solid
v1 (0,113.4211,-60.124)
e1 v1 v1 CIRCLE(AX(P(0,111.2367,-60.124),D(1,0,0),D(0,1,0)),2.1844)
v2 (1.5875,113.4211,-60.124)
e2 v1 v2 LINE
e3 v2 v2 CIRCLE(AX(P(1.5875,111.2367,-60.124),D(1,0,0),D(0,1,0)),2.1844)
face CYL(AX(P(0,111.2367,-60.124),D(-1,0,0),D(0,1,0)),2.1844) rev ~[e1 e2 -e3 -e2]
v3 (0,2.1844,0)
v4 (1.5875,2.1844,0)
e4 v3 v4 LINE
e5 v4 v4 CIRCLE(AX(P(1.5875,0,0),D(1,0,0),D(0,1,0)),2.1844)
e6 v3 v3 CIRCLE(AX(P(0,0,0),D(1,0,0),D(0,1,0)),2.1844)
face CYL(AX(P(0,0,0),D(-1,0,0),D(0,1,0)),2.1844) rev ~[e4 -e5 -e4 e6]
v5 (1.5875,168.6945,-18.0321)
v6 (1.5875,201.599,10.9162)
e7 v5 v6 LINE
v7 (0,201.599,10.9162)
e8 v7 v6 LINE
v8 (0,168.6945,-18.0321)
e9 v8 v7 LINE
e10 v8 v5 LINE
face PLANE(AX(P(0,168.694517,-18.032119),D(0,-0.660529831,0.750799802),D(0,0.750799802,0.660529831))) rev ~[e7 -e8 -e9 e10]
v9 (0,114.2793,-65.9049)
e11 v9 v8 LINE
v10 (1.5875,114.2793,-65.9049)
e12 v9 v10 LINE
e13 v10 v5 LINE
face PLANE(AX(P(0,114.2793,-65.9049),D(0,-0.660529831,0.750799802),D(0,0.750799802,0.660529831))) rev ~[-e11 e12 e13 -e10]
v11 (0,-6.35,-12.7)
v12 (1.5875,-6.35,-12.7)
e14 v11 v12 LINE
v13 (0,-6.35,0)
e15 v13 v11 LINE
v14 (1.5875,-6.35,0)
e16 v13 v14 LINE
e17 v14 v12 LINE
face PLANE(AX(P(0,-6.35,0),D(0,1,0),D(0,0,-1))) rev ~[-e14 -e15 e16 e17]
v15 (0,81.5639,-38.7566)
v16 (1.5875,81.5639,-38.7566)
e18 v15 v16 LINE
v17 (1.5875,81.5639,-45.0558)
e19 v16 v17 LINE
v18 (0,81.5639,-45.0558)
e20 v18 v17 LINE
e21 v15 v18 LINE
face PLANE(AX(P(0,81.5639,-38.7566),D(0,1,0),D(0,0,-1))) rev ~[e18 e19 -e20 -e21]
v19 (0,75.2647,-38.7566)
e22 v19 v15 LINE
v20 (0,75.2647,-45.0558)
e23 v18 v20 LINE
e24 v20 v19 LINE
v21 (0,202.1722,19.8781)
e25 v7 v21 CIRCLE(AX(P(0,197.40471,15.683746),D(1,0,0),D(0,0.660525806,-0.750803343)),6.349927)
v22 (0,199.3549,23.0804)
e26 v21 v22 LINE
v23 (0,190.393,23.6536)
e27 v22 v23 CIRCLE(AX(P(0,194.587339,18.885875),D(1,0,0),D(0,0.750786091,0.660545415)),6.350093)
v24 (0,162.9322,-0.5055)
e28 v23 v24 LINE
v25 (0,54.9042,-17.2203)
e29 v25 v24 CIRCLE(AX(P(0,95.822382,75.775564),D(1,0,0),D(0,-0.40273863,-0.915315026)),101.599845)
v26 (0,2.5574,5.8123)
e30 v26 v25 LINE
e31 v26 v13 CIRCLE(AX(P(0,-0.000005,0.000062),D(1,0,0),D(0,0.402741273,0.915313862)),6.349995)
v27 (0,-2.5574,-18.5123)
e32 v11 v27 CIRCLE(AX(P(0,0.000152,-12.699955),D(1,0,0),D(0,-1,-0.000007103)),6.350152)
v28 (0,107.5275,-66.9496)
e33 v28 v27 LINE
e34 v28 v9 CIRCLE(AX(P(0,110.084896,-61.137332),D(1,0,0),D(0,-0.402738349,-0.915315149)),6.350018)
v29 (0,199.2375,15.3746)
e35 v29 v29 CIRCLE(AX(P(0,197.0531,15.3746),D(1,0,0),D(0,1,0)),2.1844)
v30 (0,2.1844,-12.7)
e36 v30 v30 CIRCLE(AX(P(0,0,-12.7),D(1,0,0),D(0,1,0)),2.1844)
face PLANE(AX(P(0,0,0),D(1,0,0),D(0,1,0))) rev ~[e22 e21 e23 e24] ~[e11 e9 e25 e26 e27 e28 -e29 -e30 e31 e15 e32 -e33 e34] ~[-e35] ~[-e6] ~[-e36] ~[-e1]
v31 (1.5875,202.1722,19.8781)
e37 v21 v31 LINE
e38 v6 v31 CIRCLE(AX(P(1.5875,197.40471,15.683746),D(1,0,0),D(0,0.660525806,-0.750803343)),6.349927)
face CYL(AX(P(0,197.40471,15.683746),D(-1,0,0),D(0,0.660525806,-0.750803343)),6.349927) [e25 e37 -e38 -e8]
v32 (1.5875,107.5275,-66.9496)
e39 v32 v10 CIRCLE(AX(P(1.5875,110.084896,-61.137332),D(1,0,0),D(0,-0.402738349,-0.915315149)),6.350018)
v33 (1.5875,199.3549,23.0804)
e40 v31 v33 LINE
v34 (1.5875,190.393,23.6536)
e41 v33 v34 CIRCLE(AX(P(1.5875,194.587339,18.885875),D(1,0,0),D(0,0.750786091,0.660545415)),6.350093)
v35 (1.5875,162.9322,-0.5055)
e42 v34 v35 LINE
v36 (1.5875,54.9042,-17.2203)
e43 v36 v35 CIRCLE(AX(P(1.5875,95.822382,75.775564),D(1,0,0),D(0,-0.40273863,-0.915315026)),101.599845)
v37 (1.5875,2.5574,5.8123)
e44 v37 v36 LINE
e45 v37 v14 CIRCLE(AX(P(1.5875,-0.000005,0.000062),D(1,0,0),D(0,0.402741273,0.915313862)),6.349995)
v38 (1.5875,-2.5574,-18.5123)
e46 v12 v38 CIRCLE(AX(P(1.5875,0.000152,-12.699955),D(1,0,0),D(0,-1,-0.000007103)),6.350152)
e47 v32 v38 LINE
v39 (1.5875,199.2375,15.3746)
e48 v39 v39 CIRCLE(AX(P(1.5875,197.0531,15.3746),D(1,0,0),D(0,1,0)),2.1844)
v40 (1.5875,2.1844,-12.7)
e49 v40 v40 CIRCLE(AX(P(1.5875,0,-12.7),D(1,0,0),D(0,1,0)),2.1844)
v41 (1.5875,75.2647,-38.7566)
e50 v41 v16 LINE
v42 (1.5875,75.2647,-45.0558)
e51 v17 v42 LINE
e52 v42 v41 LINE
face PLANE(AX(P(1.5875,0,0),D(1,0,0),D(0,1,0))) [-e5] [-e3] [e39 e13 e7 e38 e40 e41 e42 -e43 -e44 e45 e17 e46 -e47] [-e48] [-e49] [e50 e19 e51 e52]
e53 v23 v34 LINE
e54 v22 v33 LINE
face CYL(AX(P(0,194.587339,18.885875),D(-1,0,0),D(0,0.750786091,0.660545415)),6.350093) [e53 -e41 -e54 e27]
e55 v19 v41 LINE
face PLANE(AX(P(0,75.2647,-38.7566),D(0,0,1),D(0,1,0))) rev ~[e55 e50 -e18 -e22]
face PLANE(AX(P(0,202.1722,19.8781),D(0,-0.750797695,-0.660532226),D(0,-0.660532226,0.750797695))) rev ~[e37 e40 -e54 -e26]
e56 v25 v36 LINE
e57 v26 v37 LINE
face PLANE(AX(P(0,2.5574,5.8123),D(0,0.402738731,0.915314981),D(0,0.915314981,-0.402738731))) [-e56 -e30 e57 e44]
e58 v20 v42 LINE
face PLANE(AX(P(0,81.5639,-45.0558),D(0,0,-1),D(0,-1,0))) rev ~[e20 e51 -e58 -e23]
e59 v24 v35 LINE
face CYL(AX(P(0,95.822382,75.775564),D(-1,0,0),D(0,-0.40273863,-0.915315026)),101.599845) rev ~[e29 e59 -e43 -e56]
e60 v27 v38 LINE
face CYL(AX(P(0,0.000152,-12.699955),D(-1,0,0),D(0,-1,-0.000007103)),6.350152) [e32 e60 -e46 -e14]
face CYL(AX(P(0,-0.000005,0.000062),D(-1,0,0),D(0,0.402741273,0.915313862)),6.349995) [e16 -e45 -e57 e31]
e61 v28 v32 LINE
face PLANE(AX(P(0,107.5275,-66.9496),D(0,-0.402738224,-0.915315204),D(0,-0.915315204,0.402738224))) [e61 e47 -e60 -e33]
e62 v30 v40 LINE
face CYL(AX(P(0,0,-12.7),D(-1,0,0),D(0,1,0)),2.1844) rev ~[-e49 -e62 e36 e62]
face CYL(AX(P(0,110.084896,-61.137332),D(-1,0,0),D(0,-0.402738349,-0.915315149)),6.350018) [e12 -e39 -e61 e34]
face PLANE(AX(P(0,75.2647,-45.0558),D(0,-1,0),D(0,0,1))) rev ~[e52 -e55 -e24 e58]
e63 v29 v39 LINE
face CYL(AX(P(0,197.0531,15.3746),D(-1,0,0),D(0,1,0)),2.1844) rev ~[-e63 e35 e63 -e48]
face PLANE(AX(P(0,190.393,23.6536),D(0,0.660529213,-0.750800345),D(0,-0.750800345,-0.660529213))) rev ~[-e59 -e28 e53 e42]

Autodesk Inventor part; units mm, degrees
ref_plane "YZ Plane" through (0, 0, 0) normal (1, 0, 0) x (0, 1, 0)
ref_plane "XZ Plane" through (0, 0, 0) normal (0, 1, 0) x (-1, 0, 0)
ref_plane "XY Plane" through (0, 0, 0) normal (0, 0, 1) x (1, 0, 0)
sketch "main" plane through (0, 0, 0) normal (0, 0, 1) x (1, 0, 0)
  circle A0 centre (-11.2144, -104.2473) radius 2.1844
  circle A1 centre (1.4856, -104.2473) radius 2.1844
  circle A2 centre (48.9096, 6.9894) radius 2.1844
  circle A3 centre (-26.5889, 92.8058) radius 2.1844
  arc A4 (1.4856, -110.5973) -> (7.2979, -106.8047) centre (1.4856, -104.2473) ccw
  arc A5 (-17.0266, -101.6899) -> (-11.2144, -110.5973) centre (-11.2144, -104.2473) ccw
  line L0 (54.6905, 10.0319) -> (-22.1306, 97.3516)
  line L1 (55.7352, 3.2802) -> (7.2979, -106.8047)
  line L2 (-31.0925, 97.9248) -> (-34.2947, 95.1076)
  line L3 (-33.7837, 110.5973) -> (6.8178, 64.4472)
  line L4 (-17.0266, -101.6899) -> (6.006, -49.3432)
  line L5 (-34.8679, 86.1457) -> (-10.7088, 58.6849)
  arc A6 (-34.2947, 95.1076) -> (-34.8679, 86.1457) centre (-30.1004, 90.34) ccw
  arc A7 (-22.1306, 97.3516) -> (-31.0925, 97.9248) centre (-26.8981, 93.1573) ccw
  arc A8 (55.7352, 3.2802) -> (54.6905, 10.0319) centre (49.923, 5.8376) ccw
  arc A9 (6.006, -49.3432) -> (-10.7088, 58.6849) centre (-86.9901, -8.425) ccw
  line L6 (-11.2144, -110.5973) -> (1.4856, -110.5973)
  point P0 (16.4228, 13.0791)
  point P1 (-26.3249, 102.1192)
  point P2 (49.8339, -10.1318)
  dimension "d9" = 6.35
  dimension "d10" = 6.35
  dimension "d11" = 101.6
sketch "Sketch1" plane through (0, 0, 0) normal (1, 0, 0) x (0, 1, 0)
  line L0 (75.2647, -38.7566) -> (81.5639, -38.7566)
  line L1 (81.5639, -38.7566) -> (81.5639, -45.0558)
  line L2 (81.5639, -45.0558) -> (75.2647, -45.0558)
  line L3 (75.2647, -45.0558) -> (75.2647, -38.7566)
  line L4 (75.2647, -38.7566) -> (81.5639, -45.0558) construction
  line L5 (81.5639, -38.7566) -> (75.2647, -45.0558) construction
  circle A0 centre (0, 0) radius 2.1844
  circle A1 centre (0, -12.7) radius 2.1844
  circle A2 centre (111.2367, -60.124) radius 2.1844
  circle A3 centre (197.0531, 15.3746) radius 2.1844
  arc A4 (-6.35, -12.7) -> (-2.5574, -18.5123) centre (0, -12.7) ccw
  arc A5 (2.5574, 5.8123) -> (-6.35, 0) centre (0, 0) ccw
  line L6 (114.2793, -65.9049) -> (201.599, 10.9162)
  line L7 (107.5275, -66.9496) -> (-2.5574, -18.5123)
  line L8 (202.1722, 19.8781) -> (199.3549, 23.0804)
  line L9 (214.8446, 22.5693) -> (168.6945, -18.0321)
  line L10 (2.5574, 5.8123) -> (54.9042, -17.2203)
  line L11 (190.393, 23.6536) -> (162.9322, -0.5055)
  arc A6 (199.3549, 23.0804) -> (190.393, 23.6536) centre (194.5874, 18.886) ccw
  arc A7 (201.599, 10.9162) -> (202.1722, 19.8781) centre (197.4046, 15.6838) ccw
  arc A8 (107.5275, -66.9496) -> (114.2793, -65.9049) centre (110.0849, -61.1373) ccw
  arc A9 (54.9042, -17.2203) -> (162.9322, -0.5055) centre (95.8224, 75.7757) ccw
  line L12 (-6.35, 0) -> (-6.35, -12.7)
  point P0 (0, 0)
  dimension "d12" = 6.2992
  dimension "d13" = 6.2992
extrude "Extrusion1" add sketch "Sketch1" along normal blind 1.5875
properties part number "Support Gusset" material "Acetal Resin, White"
